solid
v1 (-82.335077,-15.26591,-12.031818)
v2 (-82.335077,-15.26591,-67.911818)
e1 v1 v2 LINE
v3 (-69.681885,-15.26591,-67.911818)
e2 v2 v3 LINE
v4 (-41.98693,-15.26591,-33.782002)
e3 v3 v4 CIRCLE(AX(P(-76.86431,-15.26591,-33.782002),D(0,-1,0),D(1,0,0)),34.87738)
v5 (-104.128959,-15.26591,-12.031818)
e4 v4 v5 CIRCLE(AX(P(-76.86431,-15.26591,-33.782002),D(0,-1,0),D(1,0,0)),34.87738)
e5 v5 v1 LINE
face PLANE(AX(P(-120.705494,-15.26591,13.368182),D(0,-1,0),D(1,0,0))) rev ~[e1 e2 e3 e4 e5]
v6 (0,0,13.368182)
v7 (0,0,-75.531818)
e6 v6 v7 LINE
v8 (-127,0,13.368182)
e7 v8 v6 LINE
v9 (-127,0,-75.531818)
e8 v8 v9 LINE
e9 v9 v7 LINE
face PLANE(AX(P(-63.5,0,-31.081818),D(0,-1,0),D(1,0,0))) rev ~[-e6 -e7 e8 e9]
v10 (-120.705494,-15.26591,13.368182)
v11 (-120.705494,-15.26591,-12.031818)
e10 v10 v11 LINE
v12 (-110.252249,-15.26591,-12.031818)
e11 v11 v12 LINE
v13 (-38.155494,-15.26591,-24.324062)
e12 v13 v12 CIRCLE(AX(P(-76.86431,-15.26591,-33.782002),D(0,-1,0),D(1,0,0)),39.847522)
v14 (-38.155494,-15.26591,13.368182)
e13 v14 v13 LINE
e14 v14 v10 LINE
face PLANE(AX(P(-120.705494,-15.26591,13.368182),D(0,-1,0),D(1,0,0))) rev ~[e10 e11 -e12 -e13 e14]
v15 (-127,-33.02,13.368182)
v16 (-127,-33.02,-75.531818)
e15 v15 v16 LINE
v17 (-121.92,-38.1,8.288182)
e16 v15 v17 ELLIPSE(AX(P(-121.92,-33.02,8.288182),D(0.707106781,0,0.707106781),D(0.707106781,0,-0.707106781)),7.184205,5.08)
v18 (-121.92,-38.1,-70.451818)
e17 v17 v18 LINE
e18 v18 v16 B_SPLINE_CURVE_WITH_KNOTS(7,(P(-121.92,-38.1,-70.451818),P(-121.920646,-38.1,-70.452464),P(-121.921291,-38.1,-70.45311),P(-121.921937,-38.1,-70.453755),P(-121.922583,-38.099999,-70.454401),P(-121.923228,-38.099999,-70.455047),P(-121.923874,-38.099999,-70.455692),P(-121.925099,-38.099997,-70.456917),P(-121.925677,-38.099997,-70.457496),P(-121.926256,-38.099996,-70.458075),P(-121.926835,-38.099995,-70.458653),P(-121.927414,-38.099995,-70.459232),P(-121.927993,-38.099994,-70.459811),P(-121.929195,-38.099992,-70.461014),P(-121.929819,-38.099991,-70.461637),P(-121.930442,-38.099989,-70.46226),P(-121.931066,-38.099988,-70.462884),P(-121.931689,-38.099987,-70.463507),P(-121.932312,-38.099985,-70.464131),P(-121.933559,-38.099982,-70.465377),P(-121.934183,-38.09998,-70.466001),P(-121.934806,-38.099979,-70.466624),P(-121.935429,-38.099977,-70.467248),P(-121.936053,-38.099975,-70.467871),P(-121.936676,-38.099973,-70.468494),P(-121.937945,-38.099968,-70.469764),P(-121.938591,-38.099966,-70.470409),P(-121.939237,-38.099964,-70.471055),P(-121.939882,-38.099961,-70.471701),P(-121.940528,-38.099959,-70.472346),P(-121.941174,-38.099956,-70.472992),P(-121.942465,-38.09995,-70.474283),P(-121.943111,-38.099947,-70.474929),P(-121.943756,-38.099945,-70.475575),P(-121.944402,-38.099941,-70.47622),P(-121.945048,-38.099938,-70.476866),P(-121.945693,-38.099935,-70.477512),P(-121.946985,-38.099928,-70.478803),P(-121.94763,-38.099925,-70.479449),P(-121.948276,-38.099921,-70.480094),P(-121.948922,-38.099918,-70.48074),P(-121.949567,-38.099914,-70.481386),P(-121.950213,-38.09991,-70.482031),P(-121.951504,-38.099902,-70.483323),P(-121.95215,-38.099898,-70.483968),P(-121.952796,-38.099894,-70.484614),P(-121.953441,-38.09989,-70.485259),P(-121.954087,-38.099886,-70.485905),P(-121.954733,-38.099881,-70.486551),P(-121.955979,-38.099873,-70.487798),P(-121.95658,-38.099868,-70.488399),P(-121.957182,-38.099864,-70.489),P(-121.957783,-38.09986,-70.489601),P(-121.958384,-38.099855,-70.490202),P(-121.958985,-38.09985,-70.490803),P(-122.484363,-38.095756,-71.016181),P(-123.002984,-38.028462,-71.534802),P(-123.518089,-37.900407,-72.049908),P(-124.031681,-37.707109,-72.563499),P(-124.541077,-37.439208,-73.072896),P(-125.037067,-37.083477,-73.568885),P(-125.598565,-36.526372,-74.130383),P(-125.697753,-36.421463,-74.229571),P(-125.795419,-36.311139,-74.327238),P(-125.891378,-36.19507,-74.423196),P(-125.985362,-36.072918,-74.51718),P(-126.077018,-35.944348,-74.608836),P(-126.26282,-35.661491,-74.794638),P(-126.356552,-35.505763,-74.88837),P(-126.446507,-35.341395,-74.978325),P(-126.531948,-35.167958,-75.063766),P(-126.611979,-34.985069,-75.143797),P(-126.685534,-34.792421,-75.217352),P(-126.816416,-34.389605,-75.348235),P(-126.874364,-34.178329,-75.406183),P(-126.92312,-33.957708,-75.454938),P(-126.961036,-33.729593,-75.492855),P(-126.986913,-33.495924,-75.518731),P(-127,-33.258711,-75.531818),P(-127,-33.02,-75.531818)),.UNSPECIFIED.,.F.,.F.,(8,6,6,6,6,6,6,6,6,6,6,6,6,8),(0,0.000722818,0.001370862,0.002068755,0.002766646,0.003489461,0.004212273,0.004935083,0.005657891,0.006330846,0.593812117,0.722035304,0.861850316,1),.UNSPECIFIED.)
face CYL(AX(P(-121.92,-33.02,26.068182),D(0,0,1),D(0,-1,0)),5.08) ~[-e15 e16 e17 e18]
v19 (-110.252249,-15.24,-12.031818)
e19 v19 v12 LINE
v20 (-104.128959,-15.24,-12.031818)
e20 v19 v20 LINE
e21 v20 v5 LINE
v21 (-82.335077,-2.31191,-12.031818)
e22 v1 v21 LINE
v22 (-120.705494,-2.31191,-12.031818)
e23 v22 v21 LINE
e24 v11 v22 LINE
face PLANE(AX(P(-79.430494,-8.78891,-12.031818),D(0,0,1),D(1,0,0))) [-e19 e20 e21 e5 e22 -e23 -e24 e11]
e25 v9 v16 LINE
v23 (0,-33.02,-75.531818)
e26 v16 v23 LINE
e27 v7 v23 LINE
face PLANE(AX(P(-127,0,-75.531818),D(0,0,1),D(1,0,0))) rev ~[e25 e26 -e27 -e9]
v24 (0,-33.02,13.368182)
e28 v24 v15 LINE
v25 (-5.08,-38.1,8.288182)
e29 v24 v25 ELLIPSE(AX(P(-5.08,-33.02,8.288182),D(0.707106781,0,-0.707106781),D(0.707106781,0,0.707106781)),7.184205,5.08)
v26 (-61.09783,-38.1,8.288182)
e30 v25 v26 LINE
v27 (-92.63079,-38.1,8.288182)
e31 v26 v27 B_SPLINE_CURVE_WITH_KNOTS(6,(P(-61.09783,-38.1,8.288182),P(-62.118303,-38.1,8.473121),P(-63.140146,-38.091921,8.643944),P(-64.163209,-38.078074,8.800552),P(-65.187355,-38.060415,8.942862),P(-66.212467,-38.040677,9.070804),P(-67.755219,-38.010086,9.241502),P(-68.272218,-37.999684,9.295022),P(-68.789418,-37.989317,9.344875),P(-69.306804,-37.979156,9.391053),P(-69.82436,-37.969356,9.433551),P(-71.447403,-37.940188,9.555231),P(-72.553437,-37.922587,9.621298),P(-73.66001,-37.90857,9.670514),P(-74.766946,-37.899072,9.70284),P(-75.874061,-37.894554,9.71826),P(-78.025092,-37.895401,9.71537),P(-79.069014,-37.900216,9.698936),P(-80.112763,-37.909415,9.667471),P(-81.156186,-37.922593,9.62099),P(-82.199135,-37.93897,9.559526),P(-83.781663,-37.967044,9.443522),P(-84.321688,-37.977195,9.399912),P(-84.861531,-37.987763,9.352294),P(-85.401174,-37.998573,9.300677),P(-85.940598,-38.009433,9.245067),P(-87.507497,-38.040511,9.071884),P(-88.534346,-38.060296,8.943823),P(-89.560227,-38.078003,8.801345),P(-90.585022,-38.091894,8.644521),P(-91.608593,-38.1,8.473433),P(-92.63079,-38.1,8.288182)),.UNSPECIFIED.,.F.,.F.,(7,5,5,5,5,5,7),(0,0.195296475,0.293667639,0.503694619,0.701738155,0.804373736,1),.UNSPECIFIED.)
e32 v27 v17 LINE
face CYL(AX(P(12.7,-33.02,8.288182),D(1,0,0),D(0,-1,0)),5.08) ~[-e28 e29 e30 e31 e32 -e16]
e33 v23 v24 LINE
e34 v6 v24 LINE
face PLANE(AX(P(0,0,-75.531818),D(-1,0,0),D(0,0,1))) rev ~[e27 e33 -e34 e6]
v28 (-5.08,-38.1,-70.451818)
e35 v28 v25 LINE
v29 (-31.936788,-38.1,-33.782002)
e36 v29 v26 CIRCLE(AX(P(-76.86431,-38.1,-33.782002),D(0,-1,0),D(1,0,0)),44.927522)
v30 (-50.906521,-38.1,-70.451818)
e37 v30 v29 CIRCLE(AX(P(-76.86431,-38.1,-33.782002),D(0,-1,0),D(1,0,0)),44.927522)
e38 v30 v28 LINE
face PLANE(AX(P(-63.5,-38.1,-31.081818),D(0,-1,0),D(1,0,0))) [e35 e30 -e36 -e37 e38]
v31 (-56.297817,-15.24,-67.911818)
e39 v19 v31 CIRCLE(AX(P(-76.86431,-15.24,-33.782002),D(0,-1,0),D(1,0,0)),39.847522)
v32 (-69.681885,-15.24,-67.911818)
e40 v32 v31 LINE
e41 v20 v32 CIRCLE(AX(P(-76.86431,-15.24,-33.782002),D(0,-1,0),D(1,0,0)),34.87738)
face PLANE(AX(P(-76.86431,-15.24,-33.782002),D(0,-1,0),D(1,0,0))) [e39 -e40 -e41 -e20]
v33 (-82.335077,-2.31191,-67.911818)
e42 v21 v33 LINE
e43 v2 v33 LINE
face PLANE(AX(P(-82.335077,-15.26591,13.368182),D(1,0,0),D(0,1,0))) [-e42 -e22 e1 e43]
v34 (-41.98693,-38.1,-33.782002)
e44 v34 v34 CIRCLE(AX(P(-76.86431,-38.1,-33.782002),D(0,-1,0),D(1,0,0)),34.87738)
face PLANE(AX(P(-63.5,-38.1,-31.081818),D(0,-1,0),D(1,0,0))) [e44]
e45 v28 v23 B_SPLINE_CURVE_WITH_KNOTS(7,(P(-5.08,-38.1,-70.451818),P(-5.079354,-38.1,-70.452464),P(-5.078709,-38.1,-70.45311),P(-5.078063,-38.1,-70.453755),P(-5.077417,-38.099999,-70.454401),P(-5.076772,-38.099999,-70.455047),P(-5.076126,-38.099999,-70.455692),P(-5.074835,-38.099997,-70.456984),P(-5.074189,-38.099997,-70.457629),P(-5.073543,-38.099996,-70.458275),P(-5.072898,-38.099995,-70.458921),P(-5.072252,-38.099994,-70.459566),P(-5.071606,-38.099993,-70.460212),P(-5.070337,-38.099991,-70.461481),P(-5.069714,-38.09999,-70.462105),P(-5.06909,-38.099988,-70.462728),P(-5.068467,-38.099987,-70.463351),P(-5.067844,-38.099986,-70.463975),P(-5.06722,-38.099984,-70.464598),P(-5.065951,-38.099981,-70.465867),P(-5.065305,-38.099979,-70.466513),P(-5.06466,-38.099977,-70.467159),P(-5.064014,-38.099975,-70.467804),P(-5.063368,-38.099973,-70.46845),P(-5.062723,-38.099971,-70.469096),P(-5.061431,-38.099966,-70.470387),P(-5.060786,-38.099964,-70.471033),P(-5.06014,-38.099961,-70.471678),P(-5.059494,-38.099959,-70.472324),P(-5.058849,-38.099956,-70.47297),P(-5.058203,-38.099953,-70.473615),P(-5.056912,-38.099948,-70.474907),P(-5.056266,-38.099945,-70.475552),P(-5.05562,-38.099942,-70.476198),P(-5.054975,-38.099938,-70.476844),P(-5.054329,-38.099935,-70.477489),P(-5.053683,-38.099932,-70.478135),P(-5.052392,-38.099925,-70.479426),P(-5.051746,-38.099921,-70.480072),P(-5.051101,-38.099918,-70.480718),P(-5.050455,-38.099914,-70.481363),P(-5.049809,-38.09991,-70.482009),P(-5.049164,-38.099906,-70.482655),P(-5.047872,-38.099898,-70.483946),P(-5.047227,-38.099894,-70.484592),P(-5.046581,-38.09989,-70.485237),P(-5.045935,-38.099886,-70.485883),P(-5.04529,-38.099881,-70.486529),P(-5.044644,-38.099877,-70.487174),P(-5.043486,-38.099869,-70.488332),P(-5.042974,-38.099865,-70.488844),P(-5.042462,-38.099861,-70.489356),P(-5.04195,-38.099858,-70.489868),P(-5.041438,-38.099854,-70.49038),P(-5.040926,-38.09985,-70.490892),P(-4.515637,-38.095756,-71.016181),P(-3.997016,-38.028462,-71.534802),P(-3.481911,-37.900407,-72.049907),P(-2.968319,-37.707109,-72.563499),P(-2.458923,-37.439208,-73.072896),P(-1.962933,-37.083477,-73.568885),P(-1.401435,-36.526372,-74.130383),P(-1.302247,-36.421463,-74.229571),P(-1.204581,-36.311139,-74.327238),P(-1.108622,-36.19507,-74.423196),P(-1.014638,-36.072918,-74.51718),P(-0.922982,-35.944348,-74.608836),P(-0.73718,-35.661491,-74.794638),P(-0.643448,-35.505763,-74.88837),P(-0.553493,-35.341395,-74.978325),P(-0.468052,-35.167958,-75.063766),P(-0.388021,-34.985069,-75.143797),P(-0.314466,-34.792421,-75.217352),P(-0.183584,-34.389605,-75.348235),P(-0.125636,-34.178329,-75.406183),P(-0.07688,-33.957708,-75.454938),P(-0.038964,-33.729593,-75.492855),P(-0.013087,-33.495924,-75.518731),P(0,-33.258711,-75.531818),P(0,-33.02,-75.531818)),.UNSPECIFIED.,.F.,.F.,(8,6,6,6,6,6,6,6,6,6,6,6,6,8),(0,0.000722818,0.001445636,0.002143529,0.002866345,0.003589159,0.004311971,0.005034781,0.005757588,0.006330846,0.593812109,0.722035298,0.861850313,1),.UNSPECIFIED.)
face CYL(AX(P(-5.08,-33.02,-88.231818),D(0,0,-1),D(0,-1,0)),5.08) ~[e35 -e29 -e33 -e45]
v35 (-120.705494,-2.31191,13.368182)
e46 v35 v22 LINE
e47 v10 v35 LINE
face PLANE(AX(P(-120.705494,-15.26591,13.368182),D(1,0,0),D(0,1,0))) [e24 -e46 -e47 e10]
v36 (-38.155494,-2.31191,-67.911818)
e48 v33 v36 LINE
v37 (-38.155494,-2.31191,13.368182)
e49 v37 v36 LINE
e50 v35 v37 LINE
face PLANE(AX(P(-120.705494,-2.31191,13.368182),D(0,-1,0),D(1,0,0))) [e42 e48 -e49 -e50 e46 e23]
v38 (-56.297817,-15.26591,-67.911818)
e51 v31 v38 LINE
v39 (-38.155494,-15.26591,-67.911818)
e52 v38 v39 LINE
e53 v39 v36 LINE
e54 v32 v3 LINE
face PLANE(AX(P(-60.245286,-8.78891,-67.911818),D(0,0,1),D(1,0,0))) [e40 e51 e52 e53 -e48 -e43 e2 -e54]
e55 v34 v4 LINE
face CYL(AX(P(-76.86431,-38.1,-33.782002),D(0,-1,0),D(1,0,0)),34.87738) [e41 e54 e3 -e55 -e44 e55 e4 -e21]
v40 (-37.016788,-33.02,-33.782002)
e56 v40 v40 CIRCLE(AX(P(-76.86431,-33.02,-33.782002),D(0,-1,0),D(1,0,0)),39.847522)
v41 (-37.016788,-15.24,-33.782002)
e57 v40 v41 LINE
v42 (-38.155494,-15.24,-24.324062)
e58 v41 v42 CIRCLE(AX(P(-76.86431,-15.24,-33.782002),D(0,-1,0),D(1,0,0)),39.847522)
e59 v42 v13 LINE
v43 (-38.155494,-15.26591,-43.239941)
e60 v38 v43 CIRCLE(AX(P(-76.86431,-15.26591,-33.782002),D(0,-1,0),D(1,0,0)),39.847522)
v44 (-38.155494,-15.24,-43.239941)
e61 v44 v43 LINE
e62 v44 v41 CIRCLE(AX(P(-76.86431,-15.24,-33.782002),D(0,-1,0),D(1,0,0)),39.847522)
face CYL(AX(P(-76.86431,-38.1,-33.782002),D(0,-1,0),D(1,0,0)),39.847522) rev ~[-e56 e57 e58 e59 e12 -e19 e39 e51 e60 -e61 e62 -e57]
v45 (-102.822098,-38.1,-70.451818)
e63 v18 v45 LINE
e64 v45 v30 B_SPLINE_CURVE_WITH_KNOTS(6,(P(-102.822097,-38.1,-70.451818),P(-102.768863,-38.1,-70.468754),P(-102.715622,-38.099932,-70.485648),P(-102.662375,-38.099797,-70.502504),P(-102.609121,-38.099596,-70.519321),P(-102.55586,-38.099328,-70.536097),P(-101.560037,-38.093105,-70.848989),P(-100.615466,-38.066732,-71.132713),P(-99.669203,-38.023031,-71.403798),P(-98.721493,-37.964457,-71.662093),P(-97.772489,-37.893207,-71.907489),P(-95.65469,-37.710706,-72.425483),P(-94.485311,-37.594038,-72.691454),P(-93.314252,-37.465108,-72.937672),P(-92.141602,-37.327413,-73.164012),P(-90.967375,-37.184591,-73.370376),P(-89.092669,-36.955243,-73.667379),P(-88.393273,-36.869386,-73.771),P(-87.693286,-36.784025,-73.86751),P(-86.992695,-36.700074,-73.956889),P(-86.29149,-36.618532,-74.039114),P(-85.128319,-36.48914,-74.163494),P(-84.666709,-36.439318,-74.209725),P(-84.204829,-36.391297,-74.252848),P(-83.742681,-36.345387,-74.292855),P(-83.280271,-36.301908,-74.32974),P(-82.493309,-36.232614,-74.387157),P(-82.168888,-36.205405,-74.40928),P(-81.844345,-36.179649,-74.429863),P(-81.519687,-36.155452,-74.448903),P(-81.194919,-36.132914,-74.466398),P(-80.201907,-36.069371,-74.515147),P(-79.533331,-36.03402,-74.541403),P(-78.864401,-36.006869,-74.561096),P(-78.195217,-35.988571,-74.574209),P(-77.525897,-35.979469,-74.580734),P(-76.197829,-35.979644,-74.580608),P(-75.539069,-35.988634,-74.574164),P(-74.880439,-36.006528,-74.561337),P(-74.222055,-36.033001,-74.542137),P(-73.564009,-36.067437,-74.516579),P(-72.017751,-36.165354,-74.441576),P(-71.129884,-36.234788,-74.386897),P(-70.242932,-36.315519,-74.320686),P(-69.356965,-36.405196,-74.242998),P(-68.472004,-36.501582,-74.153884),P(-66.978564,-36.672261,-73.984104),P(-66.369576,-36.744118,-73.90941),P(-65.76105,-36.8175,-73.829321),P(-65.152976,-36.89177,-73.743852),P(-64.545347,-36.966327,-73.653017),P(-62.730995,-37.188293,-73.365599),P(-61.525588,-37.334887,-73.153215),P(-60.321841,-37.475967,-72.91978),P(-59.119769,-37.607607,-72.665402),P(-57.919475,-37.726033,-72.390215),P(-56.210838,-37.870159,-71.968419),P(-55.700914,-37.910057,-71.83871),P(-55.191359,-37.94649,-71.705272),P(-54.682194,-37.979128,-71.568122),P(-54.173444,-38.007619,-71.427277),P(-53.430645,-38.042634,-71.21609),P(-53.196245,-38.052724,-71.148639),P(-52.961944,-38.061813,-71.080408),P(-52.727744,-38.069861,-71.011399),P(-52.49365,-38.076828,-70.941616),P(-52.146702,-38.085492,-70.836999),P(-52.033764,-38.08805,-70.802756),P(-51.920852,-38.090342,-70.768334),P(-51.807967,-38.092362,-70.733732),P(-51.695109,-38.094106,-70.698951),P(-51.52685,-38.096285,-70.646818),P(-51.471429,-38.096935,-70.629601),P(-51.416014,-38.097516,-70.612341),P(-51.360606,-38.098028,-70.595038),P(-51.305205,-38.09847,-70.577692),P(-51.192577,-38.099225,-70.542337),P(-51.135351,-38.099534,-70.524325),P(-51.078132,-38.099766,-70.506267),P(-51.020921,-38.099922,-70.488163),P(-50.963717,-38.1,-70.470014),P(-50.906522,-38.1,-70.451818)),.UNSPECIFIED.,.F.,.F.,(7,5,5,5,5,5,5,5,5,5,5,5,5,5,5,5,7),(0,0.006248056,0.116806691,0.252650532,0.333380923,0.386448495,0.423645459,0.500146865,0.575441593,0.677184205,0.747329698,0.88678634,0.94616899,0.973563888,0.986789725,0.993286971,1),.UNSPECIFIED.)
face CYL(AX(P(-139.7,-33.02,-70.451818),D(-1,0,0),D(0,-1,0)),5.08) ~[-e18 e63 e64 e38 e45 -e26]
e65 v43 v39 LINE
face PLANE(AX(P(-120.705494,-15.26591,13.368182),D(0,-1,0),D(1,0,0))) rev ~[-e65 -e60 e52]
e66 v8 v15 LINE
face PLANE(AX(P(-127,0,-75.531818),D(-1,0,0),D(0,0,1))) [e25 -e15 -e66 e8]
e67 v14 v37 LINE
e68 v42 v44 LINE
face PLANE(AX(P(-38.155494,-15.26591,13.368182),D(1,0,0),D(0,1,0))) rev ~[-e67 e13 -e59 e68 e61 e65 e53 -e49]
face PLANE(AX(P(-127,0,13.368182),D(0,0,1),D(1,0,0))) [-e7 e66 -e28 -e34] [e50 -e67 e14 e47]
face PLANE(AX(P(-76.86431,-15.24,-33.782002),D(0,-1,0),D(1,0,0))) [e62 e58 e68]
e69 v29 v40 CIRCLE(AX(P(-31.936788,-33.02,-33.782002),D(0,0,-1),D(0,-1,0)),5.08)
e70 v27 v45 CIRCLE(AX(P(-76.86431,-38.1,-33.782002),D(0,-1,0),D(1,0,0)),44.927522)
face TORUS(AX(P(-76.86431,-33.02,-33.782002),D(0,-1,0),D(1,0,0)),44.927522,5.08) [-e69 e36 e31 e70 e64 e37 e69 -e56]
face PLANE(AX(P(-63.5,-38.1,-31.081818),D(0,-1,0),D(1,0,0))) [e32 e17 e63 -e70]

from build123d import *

# Parameters (mm, degrees)
F0_W         = 127
F0_H         = 88.9
F1_DEPTH     = 38.1
F2_W         = 127
F2_H         = 38.1
F2_W_2       = 82.55
F2_H_2       = 12.954
F3_DEPTH     = 25.4
F4_DEPTH     = 25.4
F5_W         = 44.1795827687
F5_H         = 12.954
F6_DEPTH     = 81.28
F7_R         = 39.8475218447
F7_R_2       = 34.8773795478
F8_DEPTH     = 22.86
F9_T3_DEPTH  = 152.4
F9_T6_DEPTH  = 114.3
F9_T9_DEPTH  = 114.3
F9_T12_DEPTH = 152.4


# Not quite as in the source:
# - a fillet or chamfer that OpenCascade refuses, or shapes differently, is made with other operations: its cross-section is extruded or revolved along the edge and cut away or added


with BuildPart() as f1:
    # F0 (on Front) → F1 (new body)
    with BuildSketch(Plane.XZ):
        with Locations((-63.5, -31.0818182497)):
            Rectangle(F0_W, F0_H)
    extrude(amount=F1_DEPTH)

    # F2 (on face) → F3 (join)
    with BuildSketch(Plane.XY.offset(13.3681817503)):
        with Locations((-63.5, -19.05)):
            Rectangle(F2_W, F2_H)
        with Locations((-79.4304944575, -8.7889100092)):
            Rectangle(F2_W_2, F2_H_2, mode=Mode.SUBTRACT)
    extrude(amount=-F3_DEPTH)

    # F2 (on face) → F4 (cut)
    with BuildSketch(Plane.XY.offset(13.3681817503)):
        with Locations((-79.4304944575, -8.7889100092)):
            Rectangle(F2_W_2, F2_H_2)
    extrude(amount=-F4_DEPTH, mode=Mode.SUBTRACT)

    # F5 (on face) → F6 (cut)
    with BuildSketch(Plane.XY.offset(13.3681817503)):
        with Locations((-60.2452858418, -8.7889100092)):
            Rectangle(F5_W, F5_H)
    extrude(amount=-F6_DEPTH, mode=Mode.SUBTRACT)

    # F7 (on face) → F8 (cut)
    with BuildSketch(Plane.XZ.offset(38.1)):
        with Locations((-76.8643096089, -33.7820015848)):
            Circle(F7_R)
        with Locations((-76.8643096089, -33.7820015848)):
            Circle(F7_R_2, mode=Mode.SUBTRACT)
    extrude(amount=-F8_DEPTH, mode=Mode.SUBTRACT)

    # F9: fillet of radius 5.08 on 5 edges, made by hand


with BuildPart() as f9_tool1:
    # F9_s2 → F9_t3 (new body)
    with BuildSketch(Plane.YZ.offset(12.7)):
        with BuildLine():
            ThreePointArc((-38.1, 8.2881817503), (-36.6121024484, 11.8802841987), (-33.02, 13.3681817503))
            Line((-33.02, 13.3681817503), (-38.1, 13.3681817503))
            Line((-38.1, 13.3681817503), (-38.1, 8.2881817503))
        make_face()
    extrude(amount=-F9_T3_DEPTH)


with BuildPart() as f9_tool4:
    # F9_s5 → F9_t6 (new body)
    with BuildSketch(Plane.XY.offset(-88.2318182497)):
        with BuildLine():
            ThreePointArc((-5.08, -38.1), (-1.4878975516, -36.6121024484), (0, -33.02))
            Line((0, -33.02), (0, -38.1))
            Line((0, -38.1), (-5.08, -38.1))
        make_face()
    extrude(amount=F9_T6_DEPTH)


with BuildPart() as f9_tool7:
    # F9_s8 → F9_t9 (new body)
    with BuildSketch(Plane.XY.offset(26.0681817503)):
        with BuildLine():
            ThreePointArc((-121.92, -38.1), (-125.5121024484, -36.6121024484), (-127, -33.02))
            Line((-127, -33.02), (-127, -38.1))
            Line((-127, -38.1), (-121.92, -38.1))
        make_face()
    extrude(amount=-F9_T9_DEPTH)


with BuildPart() as f9_tool10:
    # F9_s11 → F9_t12 (new body)
    with BuildSketch(Plane.YZ.offset(-139.7)):
        with BuildLine():
            ThreePointArc((-38.1, -70.4518182497), (-36.6121024484, -74.0439206982), (-33.02, -75.5318182497))
            Line((-33.02, -75.5318182497), (-38.1, -75.5318182497))
            Line((-38.1, -75.5318182497), (-38.1, -70.4518182497))
        make_face()
    extrude(amount=F9_T12_DEPTH)


with BuildPart() as f9_tool13:
    # F9_s14 → F9_t15 (revolve)
    with BuildSketch(Plane.XY.offset(-33.7820015848)):
        with BuildLine():
            ThreePointArc((-31.9367877642, -38.1), (-35.5288902127, -36.6121024484), (-37.0167877642, -33.02))
            Line((-37.0167877642, -33.02), (-37.0167877642, -38.1))
            Line((-37.0167877642, -38.1), (-31.9367877642, -38.1))
        make_face()
    revolve(axis=Axis((-76.8643096089, -38.1, -33.7820015848), (0, -1, 0)))


with BuildPart() as f1_1:
    add(f1.part)

    # F9_t16: cut F9_tool1, F9_tool4, F9_tool7, F9_tool10, F9_tool13
    add([f9_tool1.part, f9_tool4.part, f9_tool7.part, f9_tool10.part, f9_tool13.part], mode=Mode.SUBTRACT)


solid = f1_1.part
